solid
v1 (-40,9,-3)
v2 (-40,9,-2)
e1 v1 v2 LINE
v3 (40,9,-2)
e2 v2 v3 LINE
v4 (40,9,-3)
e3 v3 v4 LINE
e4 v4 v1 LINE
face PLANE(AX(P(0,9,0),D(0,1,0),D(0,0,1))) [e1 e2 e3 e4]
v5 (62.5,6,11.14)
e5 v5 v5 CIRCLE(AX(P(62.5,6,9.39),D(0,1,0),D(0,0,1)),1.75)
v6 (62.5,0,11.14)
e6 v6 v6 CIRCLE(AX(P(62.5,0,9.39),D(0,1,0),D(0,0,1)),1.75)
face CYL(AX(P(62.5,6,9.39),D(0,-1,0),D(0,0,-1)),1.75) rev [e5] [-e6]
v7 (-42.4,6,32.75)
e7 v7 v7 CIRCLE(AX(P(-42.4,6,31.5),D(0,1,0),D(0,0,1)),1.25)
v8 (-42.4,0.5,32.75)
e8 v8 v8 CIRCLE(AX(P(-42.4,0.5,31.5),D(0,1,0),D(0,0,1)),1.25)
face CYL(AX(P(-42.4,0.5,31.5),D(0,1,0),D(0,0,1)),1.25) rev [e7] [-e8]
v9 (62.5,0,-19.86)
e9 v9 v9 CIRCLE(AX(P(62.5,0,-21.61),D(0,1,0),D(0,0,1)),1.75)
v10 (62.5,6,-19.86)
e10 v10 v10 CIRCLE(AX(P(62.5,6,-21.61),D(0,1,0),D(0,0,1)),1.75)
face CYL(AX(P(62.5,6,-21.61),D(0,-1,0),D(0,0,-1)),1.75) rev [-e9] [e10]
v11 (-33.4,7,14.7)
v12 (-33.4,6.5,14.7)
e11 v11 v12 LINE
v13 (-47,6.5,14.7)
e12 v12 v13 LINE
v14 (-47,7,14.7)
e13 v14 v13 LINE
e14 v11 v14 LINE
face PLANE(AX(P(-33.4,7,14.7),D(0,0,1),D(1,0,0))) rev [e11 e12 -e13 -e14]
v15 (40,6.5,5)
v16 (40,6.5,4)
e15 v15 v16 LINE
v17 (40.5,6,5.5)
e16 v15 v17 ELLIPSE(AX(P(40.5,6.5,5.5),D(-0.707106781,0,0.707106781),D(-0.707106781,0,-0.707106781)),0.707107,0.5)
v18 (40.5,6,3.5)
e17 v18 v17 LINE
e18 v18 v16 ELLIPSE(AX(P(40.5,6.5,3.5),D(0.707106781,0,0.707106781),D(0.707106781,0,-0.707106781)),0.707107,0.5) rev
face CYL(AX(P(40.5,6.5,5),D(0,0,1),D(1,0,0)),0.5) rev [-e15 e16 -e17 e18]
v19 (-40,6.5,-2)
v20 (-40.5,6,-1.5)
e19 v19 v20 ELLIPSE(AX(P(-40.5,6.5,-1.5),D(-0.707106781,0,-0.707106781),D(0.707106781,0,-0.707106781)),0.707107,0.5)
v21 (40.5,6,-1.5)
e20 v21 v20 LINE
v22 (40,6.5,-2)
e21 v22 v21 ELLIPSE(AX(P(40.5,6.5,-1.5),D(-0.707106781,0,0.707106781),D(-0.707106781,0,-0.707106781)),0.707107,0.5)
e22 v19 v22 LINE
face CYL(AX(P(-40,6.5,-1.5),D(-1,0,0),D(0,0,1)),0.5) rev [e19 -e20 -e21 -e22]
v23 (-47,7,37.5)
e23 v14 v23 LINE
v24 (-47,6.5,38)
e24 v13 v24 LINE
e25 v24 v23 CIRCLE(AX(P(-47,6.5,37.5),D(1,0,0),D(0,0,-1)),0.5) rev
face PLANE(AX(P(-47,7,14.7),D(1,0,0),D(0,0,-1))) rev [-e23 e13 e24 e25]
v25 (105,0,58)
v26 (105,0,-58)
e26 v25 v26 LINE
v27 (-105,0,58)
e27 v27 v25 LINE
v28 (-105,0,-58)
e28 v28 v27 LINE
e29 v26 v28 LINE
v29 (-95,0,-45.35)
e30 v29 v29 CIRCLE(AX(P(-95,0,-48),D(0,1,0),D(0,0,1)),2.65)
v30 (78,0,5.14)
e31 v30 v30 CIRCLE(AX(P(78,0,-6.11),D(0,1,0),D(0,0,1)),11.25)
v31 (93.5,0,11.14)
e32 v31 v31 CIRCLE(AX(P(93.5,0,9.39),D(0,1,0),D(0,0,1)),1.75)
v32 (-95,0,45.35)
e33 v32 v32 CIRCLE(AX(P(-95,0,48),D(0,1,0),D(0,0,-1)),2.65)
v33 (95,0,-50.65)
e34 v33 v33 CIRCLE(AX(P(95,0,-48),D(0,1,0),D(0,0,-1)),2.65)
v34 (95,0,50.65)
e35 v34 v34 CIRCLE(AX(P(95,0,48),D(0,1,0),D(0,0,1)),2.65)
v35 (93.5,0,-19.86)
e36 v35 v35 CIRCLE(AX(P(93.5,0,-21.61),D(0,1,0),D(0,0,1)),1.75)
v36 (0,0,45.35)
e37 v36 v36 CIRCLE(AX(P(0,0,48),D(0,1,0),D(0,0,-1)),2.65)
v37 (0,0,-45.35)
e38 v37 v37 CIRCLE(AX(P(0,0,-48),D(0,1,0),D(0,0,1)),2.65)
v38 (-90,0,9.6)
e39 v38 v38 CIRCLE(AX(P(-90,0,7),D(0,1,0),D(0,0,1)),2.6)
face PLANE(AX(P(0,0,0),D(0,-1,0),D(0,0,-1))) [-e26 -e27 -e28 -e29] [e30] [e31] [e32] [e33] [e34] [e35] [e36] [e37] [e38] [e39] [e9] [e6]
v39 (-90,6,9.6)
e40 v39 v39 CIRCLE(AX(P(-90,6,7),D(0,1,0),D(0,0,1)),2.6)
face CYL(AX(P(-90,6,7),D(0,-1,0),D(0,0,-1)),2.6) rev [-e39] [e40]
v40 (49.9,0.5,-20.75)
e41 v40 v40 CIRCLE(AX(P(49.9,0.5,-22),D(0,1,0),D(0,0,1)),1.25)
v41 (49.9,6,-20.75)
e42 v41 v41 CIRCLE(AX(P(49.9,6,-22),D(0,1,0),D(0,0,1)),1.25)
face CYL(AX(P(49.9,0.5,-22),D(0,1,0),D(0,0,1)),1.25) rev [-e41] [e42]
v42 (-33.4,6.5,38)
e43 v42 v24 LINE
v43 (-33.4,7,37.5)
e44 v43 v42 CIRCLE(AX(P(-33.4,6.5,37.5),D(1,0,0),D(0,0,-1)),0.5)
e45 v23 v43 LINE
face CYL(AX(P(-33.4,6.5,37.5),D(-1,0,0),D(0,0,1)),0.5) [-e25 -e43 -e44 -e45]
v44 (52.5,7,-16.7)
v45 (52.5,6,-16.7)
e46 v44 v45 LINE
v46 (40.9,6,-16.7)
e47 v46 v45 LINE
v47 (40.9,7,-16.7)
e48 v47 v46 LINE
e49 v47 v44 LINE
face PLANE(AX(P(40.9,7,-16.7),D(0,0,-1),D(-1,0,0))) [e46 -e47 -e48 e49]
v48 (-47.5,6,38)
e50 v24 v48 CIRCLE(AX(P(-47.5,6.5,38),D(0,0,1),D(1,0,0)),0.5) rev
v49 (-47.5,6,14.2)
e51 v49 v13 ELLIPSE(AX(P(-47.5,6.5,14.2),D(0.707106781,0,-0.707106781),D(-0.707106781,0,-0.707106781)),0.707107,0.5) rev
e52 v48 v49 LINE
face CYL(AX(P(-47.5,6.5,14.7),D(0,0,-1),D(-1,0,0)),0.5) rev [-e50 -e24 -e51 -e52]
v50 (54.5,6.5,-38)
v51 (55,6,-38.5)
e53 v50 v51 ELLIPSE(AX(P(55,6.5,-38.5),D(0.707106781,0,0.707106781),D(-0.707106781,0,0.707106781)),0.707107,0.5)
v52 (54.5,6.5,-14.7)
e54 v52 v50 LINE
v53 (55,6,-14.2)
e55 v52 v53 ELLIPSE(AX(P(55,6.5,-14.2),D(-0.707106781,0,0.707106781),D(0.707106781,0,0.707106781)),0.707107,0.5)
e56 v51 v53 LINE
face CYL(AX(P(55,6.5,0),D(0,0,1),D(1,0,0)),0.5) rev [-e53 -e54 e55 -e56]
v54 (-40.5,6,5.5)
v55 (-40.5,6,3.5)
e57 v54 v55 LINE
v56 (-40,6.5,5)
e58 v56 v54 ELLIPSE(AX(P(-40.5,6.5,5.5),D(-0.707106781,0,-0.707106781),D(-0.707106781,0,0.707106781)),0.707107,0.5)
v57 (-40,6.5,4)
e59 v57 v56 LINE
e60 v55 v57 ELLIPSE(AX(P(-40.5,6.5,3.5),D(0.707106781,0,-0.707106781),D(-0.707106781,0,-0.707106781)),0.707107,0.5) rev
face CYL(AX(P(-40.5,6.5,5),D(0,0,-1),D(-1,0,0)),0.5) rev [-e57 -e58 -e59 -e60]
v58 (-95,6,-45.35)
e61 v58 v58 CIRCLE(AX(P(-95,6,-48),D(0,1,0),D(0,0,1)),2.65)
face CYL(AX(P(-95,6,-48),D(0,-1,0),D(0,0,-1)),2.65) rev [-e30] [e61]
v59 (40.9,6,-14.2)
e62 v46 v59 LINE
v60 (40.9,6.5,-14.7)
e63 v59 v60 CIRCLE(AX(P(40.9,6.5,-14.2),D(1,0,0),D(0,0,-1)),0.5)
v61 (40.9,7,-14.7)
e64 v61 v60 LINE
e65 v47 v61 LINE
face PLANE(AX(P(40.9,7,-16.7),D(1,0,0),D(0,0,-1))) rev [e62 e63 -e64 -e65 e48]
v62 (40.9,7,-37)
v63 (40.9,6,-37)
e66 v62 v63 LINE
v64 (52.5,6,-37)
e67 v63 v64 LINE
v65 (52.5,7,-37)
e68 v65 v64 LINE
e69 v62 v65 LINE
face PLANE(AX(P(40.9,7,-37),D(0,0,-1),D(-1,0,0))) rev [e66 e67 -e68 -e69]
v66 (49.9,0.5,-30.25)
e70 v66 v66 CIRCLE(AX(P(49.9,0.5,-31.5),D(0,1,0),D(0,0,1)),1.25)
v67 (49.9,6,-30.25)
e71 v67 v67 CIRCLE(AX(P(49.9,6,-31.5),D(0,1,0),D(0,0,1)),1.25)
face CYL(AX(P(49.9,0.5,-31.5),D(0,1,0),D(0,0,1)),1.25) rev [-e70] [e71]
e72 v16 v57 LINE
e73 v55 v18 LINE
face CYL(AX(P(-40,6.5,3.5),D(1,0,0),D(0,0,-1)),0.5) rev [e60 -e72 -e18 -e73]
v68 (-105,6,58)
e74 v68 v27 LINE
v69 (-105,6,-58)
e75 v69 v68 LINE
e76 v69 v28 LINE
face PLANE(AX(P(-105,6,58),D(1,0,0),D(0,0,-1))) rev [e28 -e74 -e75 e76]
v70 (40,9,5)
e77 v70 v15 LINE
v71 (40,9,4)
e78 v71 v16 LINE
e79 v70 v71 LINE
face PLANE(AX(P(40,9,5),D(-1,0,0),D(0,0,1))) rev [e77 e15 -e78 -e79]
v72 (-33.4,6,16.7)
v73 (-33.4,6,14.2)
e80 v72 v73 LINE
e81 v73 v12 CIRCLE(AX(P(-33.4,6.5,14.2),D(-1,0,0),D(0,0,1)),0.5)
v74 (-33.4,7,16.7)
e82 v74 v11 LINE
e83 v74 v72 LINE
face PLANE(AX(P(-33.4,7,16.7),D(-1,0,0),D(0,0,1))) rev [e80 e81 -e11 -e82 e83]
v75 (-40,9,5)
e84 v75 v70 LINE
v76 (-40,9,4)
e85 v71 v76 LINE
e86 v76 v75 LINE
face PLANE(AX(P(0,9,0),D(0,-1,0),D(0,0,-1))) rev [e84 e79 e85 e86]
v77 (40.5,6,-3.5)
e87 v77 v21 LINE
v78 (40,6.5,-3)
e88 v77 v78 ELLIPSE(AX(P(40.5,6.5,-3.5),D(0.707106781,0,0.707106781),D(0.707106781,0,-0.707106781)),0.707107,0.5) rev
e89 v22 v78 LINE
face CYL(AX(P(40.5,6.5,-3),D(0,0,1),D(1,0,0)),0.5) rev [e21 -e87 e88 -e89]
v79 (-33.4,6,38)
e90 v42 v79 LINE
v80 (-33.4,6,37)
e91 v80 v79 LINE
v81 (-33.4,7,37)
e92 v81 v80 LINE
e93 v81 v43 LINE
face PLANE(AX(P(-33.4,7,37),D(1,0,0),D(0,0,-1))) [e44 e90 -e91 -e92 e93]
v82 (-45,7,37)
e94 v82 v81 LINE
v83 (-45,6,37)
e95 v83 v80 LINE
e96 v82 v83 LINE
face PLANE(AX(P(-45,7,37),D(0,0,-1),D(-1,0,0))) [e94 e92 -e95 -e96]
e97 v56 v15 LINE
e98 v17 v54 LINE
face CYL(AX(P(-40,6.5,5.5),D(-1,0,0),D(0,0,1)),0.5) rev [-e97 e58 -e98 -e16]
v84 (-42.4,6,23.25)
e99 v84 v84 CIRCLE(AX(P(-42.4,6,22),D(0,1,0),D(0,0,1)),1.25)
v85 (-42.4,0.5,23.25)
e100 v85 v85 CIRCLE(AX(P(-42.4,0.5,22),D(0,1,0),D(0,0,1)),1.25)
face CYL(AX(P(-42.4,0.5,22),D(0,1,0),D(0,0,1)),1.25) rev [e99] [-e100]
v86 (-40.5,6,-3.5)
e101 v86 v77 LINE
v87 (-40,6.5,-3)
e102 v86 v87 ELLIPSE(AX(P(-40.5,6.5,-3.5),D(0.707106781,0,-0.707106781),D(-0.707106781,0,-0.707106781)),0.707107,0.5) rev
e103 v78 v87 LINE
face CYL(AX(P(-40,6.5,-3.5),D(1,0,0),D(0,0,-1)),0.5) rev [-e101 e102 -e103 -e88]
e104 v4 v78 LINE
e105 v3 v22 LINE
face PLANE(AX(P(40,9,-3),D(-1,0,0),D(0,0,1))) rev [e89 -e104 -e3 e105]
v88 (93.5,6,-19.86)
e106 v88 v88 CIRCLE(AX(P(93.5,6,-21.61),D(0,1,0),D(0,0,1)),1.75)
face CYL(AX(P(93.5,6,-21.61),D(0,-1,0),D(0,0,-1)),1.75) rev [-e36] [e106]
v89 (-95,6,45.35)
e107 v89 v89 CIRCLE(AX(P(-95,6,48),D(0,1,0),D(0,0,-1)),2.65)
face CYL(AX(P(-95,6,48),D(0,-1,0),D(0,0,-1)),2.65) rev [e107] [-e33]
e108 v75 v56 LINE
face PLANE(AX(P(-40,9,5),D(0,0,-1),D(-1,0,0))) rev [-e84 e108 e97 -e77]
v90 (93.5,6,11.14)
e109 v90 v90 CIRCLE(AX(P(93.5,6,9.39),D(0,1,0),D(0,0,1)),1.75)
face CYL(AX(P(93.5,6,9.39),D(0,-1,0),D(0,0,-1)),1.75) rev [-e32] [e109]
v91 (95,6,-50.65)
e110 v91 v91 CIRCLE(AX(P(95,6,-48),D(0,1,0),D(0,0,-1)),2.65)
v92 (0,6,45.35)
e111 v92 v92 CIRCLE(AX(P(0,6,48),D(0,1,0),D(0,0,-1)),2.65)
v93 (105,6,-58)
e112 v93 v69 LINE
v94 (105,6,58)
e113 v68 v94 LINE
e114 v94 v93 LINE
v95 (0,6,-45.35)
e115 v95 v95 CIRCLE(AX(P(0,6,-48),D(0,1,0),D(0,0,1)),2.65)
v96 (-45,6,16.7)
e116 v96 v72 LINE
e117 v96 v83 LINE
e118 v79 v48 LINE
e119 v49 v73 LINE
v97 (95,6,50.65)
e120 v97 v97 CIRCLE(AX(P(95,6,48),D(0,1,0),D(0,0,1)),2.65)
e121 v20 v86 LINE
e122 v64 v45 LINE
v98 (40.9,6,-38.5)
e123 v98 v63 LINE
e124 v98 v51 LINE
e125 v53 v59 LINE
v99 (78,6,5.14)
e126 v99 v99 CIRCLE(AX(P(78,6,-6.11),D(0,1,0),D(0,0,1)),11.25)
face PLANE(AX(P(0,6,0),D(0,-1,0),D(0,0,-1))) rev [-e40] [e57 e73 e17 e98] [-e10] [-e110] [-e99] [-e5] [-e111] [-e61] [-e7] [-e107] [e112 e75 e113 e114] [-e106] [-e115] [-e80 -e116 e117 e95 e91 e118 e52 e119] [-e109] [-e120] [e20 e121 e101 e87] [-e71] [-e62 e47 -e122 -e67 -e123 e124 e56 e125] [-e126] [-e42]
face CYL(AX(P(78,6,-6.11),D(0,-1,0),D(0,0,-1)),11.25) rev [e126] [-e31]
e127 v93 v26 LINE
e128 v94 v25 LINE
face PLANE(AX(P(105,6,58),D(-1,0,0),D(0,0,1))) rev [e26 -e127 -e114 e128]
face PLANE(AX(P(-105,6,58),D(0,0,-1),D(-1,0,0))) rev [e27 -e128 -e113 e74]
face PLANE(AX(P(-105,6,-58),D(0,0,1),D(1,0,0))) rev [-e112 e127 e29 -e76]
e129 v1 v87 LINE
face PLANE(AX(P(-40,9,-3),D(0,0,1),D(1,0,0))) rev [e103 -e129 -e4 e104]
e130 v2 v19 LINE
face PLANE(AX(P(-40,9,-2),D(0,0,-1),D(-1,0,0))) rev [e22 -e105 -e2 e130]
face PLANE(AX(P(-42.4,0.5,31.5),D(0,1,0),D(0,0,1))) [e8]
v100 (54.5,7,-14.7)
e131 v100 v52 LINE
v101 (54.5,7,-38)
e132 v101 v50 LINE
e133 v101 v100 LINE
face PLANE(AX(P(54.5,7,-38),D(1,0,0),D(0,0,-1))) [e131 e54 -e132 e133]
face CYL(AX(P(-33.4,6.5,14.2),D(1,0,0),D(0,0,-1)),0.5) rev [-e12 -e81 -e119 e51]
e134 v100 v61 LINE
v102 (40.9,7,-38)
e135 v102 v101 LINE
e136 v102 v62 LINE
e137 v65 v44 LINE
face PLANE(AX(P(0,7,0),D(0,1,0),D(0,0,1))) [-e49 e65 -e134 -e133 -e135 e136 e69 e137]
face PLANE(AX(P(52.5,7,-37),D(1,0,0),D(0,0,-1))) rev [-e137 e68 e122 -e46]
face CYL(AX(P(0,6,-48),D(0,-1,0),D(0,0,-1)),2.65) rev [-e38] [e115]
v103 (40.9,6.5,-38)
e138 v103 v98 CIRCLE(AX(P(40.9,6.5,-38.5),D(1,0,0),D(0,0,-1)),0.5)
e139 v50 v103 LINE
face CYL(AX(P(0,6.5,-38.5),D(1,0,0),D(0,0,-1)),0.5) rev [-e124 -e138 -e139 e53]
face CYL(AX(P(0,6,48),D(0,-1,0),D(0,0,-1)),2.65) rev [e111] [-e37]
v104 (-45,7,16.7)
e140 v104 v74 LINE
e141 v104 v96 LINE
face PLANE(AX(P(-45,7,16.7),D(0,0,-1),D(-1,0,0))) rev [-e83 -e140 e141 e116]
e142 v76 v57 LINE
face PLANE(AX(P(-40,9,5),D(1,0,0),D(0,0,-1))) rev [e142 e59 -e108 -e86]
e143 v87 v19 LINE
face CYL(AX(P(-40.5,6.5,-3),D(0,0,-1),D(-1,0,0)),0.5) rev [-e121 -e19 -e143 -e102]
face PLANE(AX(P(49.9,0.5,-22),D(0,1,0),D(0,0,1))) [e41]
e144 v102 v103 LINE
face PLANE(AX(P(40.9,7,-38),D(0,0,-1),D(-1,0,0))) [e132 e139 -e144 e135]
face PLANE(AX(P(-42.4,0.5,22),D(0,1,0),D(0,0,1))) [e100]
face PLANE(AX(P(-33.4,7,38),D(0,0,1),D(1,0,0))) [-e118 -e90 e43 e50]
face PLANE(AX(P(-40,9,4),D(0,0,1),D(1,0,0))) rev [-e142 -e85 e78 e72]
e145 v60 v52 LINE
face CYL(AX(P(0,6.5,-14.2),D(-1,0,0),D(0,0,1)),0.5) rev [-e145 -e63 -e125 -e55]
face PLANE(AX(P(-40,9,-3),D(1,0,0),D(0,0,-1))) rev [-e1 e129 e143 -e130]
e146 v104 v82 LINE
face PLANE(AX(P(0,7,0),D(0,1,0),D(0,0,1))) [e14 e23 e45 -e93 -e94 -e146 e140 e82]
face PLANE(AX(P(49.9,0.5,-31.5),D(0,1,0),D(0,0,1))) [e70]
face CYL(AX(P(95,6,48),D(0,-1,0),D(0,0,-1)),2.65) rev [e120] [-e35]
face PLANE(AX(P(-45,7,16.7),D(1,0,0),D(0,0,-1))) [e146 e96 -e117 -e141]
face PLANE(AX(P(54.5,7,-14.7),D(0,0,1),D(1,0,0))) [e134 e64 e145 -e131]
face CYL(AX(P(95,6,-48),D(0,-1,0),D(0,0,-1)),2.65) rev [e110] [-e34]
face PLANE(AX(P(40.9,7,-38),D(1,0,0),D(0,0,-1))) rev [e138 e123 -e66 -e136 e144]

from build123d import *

# Parameters (mm, degrees)
SKETCH1_W           = 210
SKETCH1_H           = 116
SKETCH1_R           = 2.65
SKETCH1_R_2         = 11.25
SKETCH1_R_3         = 1.75
SKETCH1_R_4         = 2.6
BOSS_EXTRUDE1_DEPTH = 6
SKETCH4_R           = 1.25
CUT_EXTRUDE1_DEPTH  = 5.5
BOSS_EXTRUDE3_DEPTH = 1
BOSS_EXTRUDE4_DEPTH = 1
SKETCH4_5_R         = 1.25
CUT_EXTRUDE2_DEPTH  = 5.5
SKETCH6_W           = 80
SKETCH6_H           = 1
BOSS_EXTRUDE5_DEPTH = 3
FILLET1_R           = 0.5


with BuildPart() as part:
    # Sketch1 → Boss-Extrude1 (new body)
    with BuildSketch(Plane(origin=(0, 0, 0), x_dir=(1, 0, 0), z_dir=(0, 1, 0))):
        Rectangle(SKETCH1_W, SKETCH1_H)
        with Locations(Location((-95, 48, 0), (0, 0, 270))):
            Circle(SKETCH1_R, mode=Mode.SUBTRACT)
        with Locations(Location((95, 48, 0), (0, 0, 90))):
            Circle(SKETCH1_R, mode=Mode.SUBTRACT)
        with Locations(Location((95, -48, 0), (0, 0, 270))):
            Circle(SKETCH1_R, mode=Mode.SUBTRACT)
        with Locations(Location((-95, -48, 0), (0, 0, 90))):
            Circle(SKETCH1_R, mode=Mode.SUBTRACT)
        with Locations(Location((78, 6.11, 0), (0, 0, 270))):
            Circle(SKETCH1_R_2, mode=Mode.SUBTRACT)
        with Locations(Location((93.5, 21.61, 0), (0, 0, 270))):
            Circle(SKETCH1_R_3, mode=Mode.SUBTRACT)
        with Locations(Location((62.5, 21.61, 0), (0, 0, 270))):
            Circle(SKETCH1_R_3, mode=Mode.SUBTRACT)
        with Locations(Location((62.5, -9.39, 0), (0, 0, 270))):
            Circle(SKETCH1_R_3, mode=Mode.SUBTRACT)
        with Locations(Location((93.5, -9.39, 0), (0, 0, 270))):
            Circle(SKETCH1_R_3, mode=Mode.SUBTRACT)
        with Locations(Location((-90, -7, 0), (0, 0, 270))):
            Circle(SKETCH1_R_4, mode=Mode.SUBTRACT)
        with Locations(Location((0, 48, 0), (0, 0, 270))):
            Circle(SKETCH1_R, mode=Mode.SUBTRACT)
        with Locations(Location((0, -48, 0), (0, 0, 90))):
            Circle(SKETCH1_R, mode=Mode.SUBTRACT)
    extrude(amount=BOSS_EXTRUDE1_DEPTH)

    # Sketch4 → Cut-Extrude1 (cut)
    with BuildSketch(Plane(origin=(0, 6, 0), x_dir=(1, 0, 0), z_dir=(0, 1, 0))):
        with Locations(Location((49.9, 31.5, 0), (0, 0, 270))):
            Circle(SKETCH4_R)
        with Locations(Location((49.9, 22, 0), (0, 0, 270))):
            Circle(SKETCH4_R)
    extrude(amount=-CUT_EXTRUDE1_DEPTH, mode=Mode.SUBTRACT)

    # Sketch4<3> → Boss-Extrude3 (add)
    with BuildSketch(Plane(origin=(0, 6, 0), x_dir=(1, 0, 0), z_dir=(0, 1, 0))):
        Polygon((40.9, 37), (52.5, 37), (52.5, 16.7), (40.9, 16.7), (40.9, 14.7), (54.5, 14.7), (54.5, 38), (40.9, 38), align=None)
    extrude(amount=BOSS_EXTRUDE3_DEPTH)

    # Sketch4<4> → Boss-Extrude4 (add)
    with BuildSketch(Plane(origin=(0, 6, 0), x_dir=(1, 0, 0), z_dir=(0, 1, 0))):
        Polygon((-45, -16.7), (-33.4, -16.7), (-33.4, -14.7), (-47, -14.7), (-47, -38), (-33.4, -38), (-33.4, -37), (-45, -37), align=None)
    extrude(amount=BOSS_EXTRUDE4_DEPTH)

    # Sketch4<5> → Cut-Extrude2 (cut)
    with BuildSketch(Plane(origin=(0, 6, 0), x_dir=(1, 0, 0), z_dir=(0, 1, 0))):
        with Locations(Location((-42.4, -22, 0), (0, 0, 270))):
            Circle(SKETCH4_5_R)
        with Locations(Location((-42.4, -31.5, 0), (0, 0, 270))):
            Circle(SKETCH4_5_R)
    extrude(amount=-CUT_EXTRUDE2_DEPTH, mode=Mode.SUBTRACT)

    # Sketch6 → Boss-Extrude5 (add)
    with BuildSketch(Plane(origin=(0, 6, 0), x_dir=(1, 0, 0), z_dir=(0, 1, 0))):
        with Locations((0, 2.5)):
            Rectangle(SKETCH6_W, SKETCH6_H)
        with Locations((0, -4.5)):
            Rectangle(SKETCH6_W, SKETCH6_H)
    extrude(amount=BOSS_EXTRUDE5_DEPTH)

    # Fillet1
    fillet1_edges = [part.edges().sort_by_distance(p)[0] for p in [
        (54.5, 6, -26.35),
        (40, 6, -2.5),
        (40, 6, 4.5),
        (0, 6, -2),
        (0, 6, -3),
        (-40, 6, -2.5),
        (0, 6, 4),
        (-40, 6, 4.5),
        (0, 6, 5),
        (-47, 6, 26.35),
        (47.7, 6, -38),
        (47.7, 6, -14.7),
        (-40.2, 6, 14.7),
        (-40.2, 7, 38),
    ]]
    fillet(fillet1_edges, radius=FILLET1_R - 0.0001)  # a hair under: the kernel refuses the full size


solid = part.part
